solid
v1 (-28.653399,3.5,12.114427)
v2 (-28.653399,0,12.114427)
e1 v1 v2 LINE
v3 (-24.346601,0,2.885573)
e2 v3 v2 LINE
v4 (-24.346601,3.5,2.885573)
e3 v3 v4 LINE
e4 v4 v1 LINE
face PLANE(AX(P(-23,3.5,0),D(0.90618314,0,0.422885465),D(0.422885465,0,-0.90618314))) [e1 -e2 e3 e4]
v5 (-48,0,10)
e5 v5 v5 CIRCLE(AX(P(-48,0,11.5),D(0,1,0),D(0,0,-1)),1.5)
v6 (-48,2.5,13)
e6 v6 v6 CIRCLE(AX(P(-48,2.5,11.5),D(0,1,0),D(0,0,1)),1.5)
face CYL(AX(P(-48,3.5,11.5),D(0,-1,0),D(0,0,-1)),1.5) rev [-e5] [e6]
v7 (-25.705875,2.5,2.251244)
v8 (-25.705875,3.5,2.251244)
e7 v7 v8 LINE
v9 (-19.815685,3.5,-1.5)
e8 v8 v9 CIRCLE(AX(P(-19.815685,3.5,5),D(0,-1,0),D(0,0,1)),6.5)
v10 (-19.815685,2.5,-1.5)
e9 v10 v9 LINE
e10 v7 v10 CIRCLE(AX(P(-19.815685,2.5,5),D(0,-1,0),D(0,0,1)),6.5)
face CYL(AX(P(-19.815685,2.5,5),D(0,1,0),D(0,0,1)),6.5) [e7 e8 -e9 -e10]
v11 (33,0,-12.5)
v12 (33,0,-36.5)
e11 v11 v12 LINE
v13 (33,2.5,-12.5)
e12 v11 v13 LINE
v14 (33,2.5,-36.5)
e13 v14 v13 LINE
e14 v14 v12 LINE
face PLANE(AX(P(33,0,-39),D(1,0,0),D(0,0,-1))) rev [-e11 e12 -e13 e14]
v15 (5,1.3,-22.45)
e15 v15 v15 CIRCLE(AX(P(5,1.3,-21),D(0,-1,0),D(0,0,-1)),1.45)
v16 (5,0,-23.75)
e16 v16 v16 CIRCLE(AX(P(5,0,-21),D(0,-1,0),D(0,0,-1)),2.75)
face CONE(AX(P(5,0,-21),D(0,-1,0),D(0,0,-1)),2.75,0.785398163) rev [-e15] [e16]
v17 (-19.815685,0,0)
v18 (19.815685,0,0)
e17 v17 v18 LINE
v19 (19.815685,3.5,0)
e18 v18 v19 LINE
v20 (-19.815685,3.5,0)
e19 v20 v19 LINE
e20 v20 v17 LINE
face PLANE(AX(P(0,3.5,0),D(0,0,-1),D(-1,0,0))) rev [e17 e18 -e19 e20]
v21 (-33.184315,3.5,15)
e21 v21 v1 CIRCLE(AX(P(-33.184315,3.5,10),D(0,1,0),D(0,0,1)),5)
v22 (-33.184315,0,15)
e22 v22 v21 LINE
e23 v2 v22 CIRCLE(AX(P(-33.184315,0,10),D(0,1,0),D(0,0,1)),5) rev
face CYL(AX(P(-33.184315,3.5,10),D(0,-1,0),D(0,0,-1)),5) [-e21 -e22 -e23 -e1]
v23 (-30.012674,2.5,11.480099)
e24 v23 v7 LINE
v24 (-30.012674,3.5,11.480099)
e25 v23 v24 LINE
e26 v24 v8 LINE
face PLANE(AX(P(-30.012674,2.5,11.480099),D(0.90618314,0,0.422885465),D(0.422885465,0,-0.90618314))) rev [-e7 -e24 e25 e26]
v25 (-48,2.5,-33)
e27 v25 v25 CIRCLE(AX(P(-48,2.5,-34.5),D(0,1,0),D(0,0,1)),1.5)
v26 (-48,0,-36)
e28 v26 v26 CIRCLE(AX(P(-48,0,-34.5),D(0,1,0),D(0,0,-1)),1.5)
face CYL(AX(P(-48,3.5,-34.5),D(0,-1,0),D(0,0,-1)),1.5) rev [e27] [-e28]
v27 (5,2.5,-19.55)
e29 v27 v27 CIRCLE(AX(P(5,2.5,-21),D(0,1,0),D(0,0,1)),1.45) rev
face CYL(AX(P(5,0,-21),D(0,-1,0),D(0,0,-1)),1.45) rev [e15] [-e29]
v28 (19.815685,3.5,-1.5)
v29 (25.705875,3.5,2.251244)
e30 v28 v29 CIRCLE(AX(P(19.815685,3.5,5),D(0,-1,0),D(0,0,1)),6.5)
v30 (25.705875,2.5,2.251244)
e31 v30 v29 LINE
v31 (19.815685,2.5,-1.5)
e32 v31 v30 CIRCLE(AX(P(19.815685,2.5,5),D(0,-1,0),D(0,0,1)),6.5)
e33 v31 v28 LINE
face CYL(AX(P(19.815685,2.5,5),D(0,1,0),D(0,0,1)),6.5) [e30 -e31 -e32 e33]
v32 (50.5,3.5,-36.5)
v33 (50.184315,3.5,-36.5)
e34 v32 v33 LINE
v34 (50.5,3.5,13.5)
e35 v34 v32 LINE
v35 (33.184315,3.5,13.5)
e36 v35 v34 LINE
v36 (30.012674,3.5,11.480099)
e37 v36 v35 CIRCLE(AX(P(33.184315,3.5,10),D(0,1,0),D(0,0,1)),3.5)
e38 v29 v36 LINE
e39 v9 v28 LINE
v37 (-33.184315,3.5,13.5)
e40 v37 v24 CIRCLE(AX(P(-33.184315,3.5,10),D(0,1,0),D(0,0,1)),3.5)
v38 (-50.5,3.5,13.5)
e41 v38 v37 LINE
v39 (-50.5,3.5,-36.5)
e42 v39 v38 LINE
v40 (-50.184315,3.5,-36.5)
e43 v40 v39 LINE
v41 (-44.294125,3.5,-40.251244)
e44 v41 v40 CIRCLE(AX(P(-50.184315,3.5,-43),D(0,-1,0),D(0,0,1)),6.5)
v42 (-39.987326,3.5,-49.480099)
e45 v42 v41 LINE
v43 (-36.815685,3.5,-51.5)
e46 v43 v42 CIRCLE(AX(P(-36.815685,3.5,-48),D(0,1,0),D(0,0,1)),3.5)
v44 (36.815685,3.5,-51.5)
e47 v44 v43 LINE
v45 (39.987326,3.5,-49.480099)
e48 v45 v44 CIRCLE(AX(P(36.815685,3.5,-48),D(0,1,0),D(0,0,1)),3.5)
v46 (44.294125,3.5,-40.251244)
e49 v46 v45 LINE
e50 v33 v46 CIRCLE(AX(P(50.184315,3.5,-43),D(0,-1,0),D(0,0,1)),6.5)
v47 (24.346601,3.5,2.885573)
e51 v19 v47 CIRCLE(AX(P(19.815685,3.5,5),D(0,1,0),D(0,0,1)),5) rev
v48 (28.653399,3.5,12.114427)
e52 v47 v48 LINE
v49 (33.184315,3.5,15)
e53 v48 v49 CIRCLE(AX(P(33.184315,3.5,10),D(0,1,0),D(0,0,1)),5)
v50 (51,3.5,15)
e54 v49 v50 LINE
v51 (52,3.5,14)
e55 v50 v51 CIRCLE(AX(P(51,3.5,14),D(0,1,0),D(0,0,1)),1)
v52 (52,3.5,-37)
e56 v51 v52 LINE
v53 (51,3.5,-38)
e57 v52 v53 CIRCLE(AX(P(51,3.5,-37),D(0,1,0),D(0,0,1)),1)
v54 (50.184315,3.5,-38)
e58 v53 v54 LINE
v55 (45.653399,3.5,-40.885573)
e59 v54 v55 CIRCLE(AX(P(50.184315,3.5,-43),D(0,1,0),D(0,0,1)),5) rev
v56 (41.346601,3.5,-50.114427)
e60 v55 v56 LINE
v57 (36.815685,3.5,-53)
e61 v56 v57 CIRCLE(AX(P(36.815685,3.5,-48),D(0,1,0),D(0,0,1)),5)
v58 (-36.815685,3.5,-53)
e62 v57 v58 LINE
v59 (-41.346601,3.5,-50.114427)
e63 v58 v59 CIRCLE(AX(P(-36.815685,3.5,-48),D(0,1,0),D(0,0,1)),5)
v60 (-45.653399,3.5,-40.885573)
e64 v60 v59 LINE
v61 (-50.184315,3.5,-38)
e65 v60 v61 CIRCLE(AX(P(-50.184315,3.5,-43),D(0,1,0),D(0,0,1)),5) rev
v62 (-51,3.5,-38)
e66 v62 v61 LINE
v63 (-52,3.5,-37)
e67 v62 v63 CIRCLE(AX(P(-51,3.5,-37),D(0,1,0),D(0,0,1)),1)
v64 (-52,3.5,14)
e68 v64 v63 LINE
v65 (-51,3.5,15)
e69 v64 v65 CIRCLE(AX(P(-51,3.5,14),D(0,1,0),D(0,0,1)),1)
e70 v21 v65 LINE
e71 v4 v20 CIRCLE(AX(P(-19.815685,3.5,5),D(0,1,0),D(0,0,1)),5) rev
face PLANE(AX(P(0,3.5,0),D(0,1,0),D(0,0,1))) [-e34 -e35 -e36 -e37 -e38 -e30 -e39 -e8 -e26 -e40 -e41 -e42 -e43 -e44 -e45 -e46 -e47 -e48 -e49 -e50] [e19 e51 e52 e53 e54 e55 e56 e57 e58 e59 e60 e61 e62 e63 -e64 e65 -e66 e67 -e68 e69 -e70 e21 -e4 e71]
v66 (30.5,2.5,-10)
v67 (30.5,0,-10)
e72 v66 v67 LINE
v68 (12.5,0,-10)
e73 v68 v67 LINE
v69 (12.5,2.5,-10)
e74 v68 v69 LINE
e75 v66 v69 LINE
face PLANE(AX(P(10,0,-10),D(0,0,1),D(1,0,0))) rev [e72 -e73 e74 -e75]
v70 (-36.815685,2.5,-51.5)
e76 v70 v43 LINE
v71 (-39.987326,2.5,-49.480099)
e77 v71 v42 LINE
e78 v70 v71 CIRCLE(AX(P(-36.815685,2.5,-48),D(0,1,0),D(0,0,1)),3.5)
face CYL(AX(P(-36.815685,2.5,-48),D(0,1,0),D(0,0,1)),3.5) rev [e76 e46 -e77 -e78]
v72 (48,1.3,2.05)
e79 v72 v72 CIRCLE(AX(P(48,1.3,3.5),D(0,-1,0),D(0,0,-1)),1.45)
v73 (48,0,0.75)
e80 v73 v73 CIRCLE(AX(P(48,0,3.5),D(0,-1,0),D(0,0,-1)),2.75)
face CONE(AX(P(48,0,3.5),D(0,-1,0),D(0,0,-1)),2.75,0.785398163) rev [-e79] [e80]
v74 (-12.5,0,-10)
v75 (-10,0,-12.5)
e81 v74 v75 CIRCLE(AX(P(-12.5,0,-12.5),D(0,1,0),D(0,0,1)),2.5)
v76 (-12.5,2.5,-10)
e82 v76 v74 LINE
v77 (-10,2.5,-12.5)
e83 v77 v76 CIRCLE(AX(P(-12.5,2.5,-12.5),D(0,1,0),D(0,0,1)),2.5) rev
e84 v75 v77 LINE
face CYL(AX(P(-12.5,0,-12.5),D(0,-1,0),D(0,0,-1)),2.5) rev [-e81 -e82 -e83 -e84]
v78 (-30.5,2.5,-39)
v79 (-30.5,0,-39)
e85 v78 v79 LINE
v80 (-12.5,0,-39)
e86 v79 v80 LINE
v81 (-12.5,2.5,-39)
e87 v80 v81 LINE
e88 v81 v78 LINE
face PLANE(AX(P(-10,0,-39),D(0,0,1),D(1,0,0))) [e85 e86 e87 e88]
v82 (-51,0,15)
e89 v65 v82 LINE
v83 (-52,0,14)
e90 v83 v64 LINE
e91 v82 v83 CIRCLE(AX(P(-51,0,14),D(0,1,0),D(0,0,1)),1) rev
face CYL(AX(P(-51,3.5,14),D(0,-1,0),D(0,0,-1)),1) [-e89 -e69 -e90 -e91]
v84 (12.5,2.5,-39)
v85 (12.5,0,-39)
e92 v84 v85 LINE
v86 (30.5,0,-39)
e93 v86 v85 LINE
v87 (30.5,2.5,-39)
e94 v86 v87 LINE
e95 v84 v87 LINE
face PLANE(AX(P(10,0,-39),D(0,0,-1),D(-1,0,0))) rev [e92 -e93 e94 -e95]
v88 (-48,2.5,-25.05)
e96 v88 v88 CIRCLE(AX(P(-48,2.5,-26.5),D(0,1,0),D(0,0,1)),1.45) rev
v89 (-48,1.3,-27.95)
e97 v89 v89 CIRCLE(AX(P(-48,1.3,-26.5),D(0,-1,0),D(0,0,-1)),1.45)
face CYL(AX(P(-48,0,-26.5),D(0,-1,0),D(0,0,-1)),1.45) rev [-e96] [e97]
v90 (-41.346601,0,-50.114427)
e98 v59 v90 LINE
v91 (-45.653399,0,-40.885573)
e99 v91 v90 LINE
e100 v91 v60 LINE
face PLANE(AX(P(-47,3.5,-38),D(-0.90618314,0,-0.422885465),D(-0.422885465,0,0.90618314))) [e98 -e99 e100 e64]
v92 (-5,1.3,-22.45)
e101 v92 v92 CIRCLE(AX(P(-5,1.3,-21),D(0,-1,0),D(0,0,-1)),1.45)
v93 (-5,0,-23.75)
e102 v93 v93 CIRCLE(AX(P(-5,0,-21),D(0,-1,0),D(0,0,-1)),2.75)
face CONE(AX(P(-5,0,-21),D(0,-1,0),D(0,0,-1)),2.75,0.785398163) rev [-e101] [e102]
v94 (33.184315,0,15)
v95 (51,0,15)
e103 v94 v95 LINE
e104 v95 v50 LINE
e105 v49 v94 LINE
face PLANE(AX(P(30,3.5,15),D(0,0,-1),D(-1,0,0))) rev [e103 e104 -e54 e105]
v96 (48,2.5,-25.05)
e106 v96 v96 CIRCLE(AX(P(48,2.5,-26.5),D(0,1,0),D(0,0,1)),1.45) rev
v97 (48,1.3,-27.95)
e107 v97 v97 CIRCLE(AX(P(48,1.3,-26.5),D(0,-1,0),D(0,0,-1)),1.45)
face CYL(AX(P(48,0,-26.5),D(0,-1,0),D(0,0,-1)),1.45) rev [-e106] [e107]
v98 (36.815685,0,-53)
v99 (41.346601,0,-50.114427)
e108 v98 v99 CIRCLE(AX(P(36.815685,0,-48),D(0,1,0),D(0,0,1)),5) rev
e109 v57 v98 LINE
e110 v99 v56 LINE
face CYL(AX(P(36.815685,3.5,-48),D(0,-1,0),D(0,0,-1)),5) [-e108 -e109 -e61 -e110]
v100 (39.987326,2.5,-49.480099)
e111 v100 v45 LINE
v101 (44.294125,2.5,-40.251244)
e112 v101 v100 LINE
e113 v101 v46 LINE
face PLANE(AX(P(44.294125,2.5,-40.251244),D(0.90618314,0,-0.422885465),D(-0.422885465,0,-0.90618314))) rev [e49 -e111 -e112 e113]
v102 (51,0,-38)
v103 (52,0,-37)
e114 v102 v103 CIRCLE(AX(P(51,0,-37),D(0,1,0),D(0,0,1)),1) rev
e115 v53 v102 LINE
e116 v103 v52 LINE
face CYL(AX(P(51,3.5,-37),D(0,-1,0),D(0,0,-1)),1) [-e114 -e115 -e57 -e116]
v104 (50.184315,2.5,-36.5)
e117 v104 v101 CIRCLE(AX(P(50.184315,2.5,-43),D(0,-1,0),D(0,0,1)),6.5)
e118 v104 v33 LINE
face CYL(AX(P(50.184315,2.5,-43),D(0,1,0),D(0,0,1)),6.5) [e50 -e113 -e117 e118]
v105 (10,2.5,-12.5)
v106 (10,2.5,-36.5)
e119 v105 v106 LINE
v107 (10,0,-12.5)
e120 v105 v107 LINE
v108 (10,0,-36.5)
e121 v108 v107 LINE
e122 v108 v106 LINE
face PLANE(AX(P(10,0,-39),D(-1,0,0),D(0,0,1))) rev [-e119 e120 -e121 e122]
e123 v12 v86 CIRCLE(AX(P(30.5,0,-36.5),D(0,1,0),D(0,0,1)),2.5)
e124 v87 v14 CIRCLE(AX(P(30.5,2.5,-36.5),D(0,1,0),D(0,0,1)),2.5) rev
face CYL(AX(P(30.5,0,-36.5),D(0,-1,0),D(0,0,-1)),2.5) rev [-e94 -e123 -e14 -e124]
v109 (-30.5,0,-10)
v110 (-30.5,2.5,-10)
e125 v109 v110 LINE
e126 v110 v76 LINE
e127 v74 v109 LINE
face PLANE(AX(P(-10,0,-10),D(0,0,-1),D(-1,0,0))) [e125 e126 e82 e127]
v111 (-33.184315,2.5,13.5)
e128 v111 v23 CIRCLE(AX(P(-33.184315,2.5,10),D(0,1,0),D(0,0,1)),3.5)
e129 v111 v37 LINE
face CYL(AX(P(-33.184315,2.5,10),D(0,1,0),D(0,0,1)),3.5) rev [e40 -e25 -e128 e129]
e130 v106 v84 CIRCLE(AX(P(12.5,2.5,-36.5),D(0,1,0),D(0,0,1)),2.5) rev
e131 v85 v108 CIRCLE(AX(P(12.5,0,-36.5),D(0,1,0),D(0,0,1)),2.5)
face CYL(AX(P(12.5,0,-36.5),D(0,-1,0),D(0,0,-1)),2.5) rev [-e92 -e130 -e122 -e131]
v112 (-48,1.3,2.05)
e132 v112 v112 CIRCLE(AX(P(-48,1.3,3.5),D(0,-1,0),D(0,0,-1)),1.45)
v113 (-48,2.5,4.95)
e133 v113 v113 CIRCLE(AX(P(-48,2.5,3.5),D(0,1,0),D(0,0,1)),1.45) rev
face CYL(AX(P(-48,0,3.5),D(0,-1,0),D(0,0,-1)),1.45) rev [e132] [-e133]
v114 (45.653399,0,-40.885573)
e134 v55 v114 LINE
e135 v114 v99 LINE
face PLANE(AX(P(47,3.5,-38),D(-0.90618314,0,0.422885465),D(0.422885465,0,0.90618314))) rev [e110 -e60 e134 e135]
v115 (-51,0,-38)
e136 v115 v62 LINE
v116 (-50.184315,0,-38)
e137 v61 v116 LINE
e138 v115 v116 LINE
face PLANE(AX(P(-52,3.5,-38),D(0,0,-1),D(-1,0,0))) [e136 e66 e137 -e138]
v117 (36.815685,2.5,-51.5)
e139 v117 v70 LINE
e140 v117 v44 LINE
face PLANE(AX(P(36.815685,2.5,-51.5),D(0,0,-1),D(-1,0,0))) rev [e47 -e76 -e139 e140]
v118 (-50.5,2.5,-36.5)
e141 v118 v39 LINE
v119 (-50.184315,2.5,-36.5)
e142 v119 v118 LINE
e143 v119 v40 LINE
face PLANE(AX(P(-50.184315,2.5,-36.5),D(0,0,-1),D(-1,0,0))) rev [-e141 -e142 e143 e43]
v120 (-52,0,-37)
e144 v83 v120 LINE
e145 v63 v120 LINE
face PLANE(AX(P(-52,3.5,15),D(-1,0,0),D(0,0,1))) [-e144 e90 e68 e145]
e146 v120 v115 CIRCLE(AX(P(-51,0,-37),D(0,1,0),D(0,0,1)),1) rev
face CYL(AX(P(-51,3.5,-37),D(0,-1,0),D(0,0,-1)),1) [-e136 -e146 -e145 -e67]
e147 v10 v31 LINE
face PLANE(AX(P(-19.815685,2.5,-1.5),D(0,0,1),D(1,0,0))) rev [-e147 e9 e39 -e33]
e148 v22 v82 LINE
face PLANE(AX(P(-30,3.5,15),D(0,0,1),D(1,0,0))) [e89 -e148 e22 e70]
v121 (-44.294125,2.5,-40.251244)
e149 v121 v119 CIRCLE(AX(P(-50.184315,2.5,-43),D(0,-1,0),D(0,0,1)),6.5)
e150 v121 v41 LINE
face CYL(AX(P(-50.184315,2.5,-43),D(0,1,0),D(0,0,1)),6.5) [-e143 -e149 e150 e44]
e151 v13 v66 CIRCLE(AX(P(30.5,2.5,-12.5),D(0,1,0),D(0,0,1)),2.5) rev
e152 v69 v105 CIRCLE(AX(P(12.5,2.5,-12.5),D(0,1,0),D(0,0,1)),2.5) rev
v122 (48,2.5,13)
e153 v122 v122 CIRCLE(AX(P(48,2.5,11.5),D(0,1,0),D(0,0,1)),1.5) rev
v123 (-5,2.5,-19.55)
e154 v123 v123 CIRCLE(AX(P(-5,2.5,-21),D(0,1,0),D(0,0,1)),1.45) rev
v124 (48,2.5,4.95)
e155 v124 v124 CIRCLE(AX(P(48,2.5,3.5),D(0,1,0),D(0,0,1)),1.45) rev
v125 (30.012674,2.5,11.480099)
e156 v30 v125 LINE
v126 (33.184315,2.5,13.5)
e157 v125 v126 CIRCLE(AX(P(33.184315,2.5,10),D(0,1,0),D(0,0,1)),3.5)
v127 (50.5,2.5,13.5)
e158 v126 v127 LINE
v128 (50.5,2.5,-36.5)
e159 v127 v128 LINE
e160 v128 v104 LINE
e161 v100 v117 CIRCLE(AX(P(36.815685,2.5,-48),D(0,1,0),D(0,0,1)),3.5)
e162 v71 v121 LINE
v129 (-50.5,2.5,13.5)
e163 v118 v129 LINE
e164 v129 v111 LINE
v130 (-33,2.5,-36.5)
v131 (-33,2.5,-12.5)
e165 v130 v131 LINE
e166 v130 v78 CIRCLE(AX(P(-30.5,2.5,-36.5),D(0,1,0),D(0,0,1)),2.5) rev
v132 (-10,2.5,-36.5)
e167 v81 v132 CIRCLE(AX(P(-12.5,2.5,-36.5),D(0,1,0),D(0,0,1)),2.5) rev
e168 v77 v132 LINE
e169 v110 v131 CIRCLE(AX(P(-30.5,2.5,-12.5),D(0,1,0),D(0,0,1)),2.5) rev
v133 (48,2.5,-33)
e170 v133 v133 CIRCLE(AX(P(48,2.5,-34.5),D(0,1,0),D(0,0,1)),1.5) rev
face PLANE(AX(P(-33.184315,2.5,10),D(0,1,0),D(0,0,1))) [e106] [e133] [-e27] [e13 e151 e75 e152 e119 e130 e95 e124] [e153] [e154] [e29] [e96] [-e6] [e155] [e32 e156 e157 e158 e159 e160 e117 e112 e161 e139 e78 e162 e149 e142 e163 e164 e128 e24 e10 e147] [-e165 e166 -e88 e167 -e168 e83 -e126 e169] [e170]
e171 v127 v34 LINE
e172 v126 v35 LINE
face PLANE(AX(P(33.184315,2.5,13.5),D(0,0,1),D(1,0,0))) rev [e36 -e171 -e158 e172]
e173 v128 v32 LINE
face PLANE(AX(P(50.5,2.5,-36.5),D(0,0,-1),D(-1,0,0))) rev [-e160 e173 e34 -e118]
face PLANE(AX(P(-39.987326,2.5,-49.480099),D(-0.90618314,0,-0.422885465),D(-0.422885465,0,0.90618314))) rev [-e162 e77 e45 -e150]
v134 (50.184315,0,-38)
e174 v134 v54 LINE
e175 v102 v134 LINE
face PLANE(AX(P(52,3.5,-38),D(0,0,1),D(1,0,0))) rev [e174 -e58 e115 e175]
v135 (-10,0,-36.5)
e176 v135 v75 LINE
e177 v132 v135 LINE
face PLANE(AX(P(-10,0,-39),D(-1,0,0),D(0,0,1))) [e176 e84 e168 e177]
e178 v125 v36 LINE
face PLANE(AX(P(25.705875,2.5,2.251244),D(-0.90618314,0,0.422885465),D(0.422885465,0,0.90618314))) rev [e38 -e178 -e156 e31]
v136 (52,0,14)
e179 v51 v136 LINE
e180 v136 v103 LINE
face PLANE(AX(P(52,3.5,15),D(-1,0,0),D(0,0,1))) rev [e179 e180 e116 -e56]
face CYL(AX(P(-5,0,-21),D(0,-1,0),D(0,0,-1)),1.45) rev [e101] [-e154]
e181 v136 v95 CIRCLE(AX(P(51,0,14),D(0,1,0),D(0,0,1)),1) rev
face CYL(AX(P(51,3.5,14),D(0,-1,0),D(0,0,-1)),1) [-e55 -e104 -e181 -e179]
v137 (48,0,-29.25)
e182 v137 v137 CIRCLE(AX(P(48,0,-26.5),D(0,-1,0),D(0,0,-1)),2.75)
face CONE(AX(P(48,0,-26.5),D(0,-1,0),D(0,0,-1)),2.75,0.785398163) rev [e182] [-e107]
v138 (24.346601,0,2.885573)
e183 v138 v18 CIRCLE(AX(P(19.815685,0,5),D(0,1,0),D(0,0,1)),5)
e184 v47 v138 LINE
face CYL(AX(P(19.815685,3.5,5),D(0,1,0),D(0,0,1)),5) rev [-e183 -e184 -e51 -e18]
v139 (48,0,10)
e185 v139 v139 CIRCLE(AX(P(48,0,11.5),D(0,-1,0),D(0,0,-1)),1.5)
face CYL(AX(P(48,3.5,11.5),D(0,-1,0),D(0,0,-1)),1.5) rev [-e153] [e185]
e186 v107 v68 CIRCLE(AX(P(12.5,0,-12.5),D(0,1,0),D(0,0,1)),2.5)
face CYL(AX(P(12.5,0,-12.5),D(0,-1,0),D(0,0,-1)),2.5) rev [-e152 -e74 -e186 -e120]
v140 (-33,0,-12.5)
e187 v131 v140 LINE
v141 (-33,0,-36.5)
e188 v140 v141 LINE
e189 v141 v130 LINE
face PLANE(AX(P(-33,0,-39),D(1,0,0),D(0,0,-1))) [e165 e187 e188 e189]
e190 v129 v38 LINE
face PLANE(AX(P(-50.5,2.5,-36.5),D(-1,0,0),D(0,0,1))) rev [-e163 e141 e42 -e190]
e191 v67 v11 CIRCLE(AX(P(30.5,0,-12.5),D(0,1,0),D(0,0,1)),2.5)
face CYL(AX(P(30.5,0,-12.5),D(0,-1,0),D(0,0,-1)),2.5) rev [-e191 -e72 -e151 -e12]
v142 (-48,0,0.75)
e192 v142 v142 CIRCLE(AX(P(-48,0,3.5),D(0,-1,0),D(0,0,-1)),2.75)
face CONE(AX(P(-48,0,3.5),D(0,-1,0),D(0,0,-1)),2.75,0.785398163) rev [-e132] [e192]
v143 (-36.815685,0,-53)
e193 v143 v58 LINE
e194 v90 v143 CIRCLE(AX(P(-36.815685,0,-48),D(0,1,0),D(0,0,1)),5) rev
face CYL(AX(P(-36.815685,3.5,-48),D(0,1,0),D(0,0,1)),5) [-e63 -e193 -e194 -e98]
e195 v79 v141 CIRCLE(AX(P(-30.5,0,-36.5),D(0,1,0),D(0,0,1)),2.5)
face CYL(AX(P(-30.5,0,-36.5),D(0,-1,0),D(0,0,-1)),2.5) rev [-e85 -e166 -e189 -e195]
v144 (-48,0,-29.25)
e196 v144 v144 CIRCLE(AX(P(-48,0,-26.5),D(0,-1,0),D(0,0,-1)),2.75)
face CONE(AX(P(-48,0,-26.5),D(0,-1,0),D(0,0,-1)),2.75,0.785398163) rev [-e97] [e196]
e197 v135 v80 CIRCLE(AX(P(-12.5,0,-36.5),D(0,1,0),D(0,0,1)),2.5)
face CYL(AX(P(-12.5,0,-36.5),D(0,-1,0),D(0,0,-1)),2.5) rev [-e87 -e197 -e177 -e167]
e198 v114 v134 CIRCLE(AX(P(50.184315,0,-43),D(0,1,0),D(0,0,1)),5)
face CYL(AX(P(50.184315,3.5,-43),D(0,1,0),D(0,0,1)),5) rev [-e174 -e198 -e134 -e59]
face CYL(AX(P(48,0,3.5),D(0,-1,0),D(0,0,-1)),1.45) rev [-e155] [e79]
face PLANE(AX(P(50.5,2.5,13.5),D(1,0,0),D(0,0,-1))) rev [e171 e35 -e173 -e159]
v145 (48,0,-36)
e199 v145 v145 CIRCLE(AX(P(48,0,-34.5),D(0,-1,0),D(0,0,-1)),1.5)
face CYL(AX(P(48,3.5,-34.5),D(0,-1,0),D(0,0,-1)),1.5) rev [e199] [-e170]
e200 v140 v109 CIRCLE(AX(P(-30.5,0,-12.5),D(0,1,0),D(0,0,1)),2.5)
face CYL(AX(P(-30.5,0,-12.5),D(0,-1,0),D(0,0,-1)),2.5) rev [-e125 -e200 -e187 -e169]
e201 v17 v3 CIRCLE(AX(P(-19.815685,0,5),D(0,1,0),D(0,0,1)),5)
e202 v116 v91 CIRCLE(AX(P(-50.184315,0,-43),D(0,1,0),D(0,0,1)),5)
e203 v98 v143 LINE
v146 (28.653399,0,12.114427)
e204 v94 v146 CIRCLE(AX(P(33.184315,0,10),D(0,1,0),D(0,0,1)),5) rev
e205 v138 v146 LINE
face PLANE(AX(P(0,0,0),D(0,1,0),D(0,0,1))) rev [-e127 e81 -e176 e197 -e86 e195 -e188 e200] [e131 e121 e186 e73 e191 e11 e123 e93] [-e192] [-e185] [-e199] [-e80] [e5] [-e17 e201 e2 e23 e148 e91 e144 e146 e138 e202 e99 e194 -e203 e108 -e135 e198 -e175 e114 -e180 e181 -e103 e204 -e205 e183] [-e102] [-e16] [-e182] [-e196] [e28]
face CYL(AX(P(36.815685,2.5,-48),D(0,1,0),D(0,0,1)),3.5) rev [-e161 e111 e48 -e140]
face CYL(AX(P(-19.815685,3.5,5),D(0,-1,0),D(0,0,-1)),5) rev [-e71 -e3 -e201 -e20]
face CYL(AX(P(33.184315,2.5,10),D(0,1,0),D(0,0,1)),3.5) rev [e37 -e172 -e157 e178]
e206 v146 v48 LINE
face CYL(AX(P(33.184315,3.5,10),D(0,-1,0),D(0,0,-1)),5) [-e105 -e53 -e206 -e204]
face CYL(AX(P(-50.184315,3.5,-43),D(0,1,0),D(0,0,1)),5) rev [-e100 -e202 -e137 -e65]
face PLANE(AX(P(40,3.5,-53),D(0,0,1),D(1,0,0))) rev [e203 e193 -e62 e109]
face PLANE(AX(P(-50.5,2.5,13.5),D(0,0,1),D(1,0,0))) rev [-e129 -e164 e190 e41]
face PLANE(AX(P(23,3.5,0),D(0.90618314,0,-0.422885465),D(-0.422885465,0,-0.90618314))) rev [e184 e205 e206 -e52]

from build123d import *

# Parameters (mm, degrees)
BOSS_EXTRUDE1_DEPTH                               = 3.5
FILLET1_R                                         = 5
FILLET2_R                                         = 1
CSK_FOR_M2_5_FLAT_HEAD_MACHINE_SCREW1_D           = 2.9
CSK_FOR_M2_5_FLAT_HEAD_MACHINE_SCREW1_CSINK_D     = 5.5
CSK_FOR_M2_5_FLAT_HEAD_MACHINE_SCREW1_CSINK_ANGLE = 90
SKETCH6_R                                         = 1.5
CUT_EXTRUDE3_DEPTH                                = 75.3320254
SKETCH7_W                                         = 23
SKETCH7_H                                         = 29
CUT_EXTRUDE4_DEPTH                                = 75.3320254
FILLET3_R                                         = 2.5
FILLET1_OF_MIRROR1_R                              = 5
FILLET2_OF_MIRROR1_R                              = 1
FILLET3_OF_MIRROR1_R                              = 2.5
CUT_EXTRUDE2_DEPTH                                = 1


with BuildPart() as part:
    # Sketch1 → Boss-Extrude1 (new body)
    with BuildSketch(Plane(origin=(0, 0, 0), x_dir=(1, 0, 0), z_dir=(0, 1, 0))):
        Polygon((0, 0), (23, 0), (30, -15), (52, -15), (52, 38), (47, 38), (40, 53), (0, 53), align=None)
    boss_extrude1 = extrude(amount=BOSS_EXTRUDE1_DEPTH)

    # Fillet1
    fillet1_edges = [part.edges().sort_by_distance(p)[0] for p in [
        (47, 1.75, -38),
        (40, 1.75, -53),
        (30, 1.75, 15),
        (23, 1.75, 0),
    ]]
    fillet(fillet1_edges, radius=FILLET1_R)

    # Fillet2
    fillet2_edges = [part.edges().sort_by_distance(p)[0] for p in [
        (52, 1.75, 15),
        (52, 1.75, -38),
    ]]
    fillet(fillet2_edges, radius=FILLET2_R)

    # CSK for M2.5 Flat Head Machine Screw1 (through all)
    with Locations(Plane(origin=(0, 0, 0), x_dir=(-1, 0, 0), z_dir=(0, -1, 0))):
        with Locations((-5, 21), (-48, -3.5), (-48, 26.5)):
            csk_for_m2_5_flat_head_machine_screw1 = CounterSinkHole(CSK_FOR_M2_5_FLAT_HEAD_MACHINE_SCREW1_D / 2, CSK_FOR_M2_5_FLAT_HEAD_MACHINE_SCREW1_CSINK_D / 2, counter_sink_angle=CSK_FOR_M2_5_FLAT_HEAD_MACHINE_SCREW1_CSINK_ANGLE)

    # Sketch6 → Cut-Extrude3 (cut, through all)
    with BuildSketch(Plane.XZ):
        with Locations((48, 11.5)):
            Circle(SKETCH6_R)
        with Locations((48, -34.5)):
            Circle(SKETCH6_R)
    cut_extrude3 = extrude(amount=-CUT_EXTRUDE3_DEPTH, mode=Mode.SUBTRACT)

    # Sketch7 → Cut-Extrude4 (cut, through all)
    with BuildSketch(Plane(origin=(0, 3.5, 0), x_dir=(1, 0, 0), z_dir=(0, 1, 0))):
        with Locations((21.5, 24.5)):
            Rectangle(SKETCH7_W, SKETCH7_H)
    cut_extrude4 = extrude(amount=-CUT_EXTRUDE4_DEPTH, mode=Mode.SUBTRACT)

    # Fillet3
    fillet3_edges = [part.edges().sort_by_distance(p)[0] for p in [
        (33, 1.75, -39),
        (33, 1.75, -10),
        (10, 1.75, -10),
        (10, 1.75, -39),
    ]]
    fillet(fillet3_edges, radius=FILLET3_R)

    # Mirror1: Boss-Extrude1, CSK for M2.5 Flat Head Machine Screw1, Cut-Extrude3, Cut-Extrude4 across plane
    add(boss_extrude1.mirror(Plane(origin=(0, 0, 0), x_dir=(0, 0, 1), z_dir=(1, 0, 0))))
    add(csk_for_m2_5_flat_head_machine_screw1.mirror(Plane(origin=(0, 0, 0), x_dir=(0, 0, 1), z_dir=(1, 0, 0))), mode=Mode.SUBTRACT)
    add(cut_extrude3.mirror(Plane(origin=(0, 0, 0), x_dir=(0, 0, 1), z_dir=(1, 0, 0))), mode=Mode.SUBTRACT)
    add(cut_extrude4.mirror(Plane(origin=(0, 0, 0), x_dir=(0, 0, 1), z_dir=(1, 0, 0))), mode=Mode.SUBTRACT)

    # Fillet1 of Mirror1
    fillet1_of_mirror1_edges = [part.edges().sort_by_distance(p)[0] for p in [
        (-47, 1.75, -38),
        (-40, 1.75, -53),
        (-30, 1.75, 15),
        (-23, 1.75, 0),
    ]]
    fillet(fillet1_of_mirror1_edges, radius=FILLET1_OF_MIRROR1_R)

    # Fillet2 of Mirror1
    fillet2_of_mirror1_edges = [part.edges().sort_by_distance(p)[0] for p in [
        (-52, 1.75, 15),
        (-52, 1.75, -38),
    ]]
    fillet(fillet2_of_mirror1_edges, radius=FILLET2_OF_MIRROR1_R)

    # Fillet3 of Mirror1
    fillet3_of_mirror1_edges = [part.edges().sort_by_distance(p)[0] for p in [
        (-33, 1.75, -39),
        (-33, 1.75, -10),
        (-10, 1.75, -10),
        (-10, 1.75, -39),
    ]]
    fillet(fillet3_of_mirror1_edges, radius=FILLET3_OF_MIRROR1_R)

    # Sketch2 → Cut-Extrude2 (cut)
    with BuildSketch(Plane(origin=(0, 3.5, 0), x_dir=(1, 0, 0), z_dir=(0, 1, 0))):
        with BuildLine():
            Line((-50.5, 36.5), (-50.5, -13.5))
            Line((-50.5, -13.5), (-33.184315119, -13.5))
            ThreePointArc((-33.184315119, -13.5), (-31.304201685, -12.952147265), (-30.012674129, -11.480099129))
            Line((-30.012674129, -11.480099129), (-25.705875291, -2.251244475))
            ThreePointArc((-25.705875291, -2.251244475), (-23.307324116, 0.482559207), (-19.815684881, 1.5))
            Line((-19.815684881, 1.5), (19.815684881, 1.5))
            ThreePointArc((19.815684881, 1.5), (23.307324116, 0.482559207), (25.705875291, -2.251244475))
            Line((25.705875291, -2.251244475), (30.012674129, -11.480099129))
            ThreePointArc((30.012674129, -11.480099129), (31.304201685, -12.952147265), (33.184315119, -13.5))
            Line((33.184315119, -13.5), (50.5, -13.5))
            Line((50.5, -13.5), (50.5, 36.5))
            Line((50.5, 36.5), (50.184315119, 36.5))
            ThreePointArc((50.184315119, 36.5), (46.692675884, 37.517440793), (44.294124709, 40.251244475))
            Line((44.294124709, 40.251244475), (39.987325871, 49.480099129))
            ThreePointArc((39.987325871, 49.480099129), (38.695798315, 50.952147265), (36.815684881, 51.5))
            Line((36.815684881, 51.5), (-36.815684881, 51.5))
            ThreePointArc((-36.815684881, 51.5), (-38.695798315, 50.952147265), (-39.987325871, 49.480099129))
            Line((-39.987325871, 49.480099129), (-44.294124709, 40.251244475))
            ThreePointArc((-44.294124709, 40.251244475), (-46.692675884, 37.517440793), (-50.184315119, 36.5))
            Line((-50.184315119, 36.5), (-50.5, 36.5))
        make_face()
    extrude(amount=-CUT_EXTRUDE2_DEPTH, mode=Mode.SUBTRACT)


solid = part.part
